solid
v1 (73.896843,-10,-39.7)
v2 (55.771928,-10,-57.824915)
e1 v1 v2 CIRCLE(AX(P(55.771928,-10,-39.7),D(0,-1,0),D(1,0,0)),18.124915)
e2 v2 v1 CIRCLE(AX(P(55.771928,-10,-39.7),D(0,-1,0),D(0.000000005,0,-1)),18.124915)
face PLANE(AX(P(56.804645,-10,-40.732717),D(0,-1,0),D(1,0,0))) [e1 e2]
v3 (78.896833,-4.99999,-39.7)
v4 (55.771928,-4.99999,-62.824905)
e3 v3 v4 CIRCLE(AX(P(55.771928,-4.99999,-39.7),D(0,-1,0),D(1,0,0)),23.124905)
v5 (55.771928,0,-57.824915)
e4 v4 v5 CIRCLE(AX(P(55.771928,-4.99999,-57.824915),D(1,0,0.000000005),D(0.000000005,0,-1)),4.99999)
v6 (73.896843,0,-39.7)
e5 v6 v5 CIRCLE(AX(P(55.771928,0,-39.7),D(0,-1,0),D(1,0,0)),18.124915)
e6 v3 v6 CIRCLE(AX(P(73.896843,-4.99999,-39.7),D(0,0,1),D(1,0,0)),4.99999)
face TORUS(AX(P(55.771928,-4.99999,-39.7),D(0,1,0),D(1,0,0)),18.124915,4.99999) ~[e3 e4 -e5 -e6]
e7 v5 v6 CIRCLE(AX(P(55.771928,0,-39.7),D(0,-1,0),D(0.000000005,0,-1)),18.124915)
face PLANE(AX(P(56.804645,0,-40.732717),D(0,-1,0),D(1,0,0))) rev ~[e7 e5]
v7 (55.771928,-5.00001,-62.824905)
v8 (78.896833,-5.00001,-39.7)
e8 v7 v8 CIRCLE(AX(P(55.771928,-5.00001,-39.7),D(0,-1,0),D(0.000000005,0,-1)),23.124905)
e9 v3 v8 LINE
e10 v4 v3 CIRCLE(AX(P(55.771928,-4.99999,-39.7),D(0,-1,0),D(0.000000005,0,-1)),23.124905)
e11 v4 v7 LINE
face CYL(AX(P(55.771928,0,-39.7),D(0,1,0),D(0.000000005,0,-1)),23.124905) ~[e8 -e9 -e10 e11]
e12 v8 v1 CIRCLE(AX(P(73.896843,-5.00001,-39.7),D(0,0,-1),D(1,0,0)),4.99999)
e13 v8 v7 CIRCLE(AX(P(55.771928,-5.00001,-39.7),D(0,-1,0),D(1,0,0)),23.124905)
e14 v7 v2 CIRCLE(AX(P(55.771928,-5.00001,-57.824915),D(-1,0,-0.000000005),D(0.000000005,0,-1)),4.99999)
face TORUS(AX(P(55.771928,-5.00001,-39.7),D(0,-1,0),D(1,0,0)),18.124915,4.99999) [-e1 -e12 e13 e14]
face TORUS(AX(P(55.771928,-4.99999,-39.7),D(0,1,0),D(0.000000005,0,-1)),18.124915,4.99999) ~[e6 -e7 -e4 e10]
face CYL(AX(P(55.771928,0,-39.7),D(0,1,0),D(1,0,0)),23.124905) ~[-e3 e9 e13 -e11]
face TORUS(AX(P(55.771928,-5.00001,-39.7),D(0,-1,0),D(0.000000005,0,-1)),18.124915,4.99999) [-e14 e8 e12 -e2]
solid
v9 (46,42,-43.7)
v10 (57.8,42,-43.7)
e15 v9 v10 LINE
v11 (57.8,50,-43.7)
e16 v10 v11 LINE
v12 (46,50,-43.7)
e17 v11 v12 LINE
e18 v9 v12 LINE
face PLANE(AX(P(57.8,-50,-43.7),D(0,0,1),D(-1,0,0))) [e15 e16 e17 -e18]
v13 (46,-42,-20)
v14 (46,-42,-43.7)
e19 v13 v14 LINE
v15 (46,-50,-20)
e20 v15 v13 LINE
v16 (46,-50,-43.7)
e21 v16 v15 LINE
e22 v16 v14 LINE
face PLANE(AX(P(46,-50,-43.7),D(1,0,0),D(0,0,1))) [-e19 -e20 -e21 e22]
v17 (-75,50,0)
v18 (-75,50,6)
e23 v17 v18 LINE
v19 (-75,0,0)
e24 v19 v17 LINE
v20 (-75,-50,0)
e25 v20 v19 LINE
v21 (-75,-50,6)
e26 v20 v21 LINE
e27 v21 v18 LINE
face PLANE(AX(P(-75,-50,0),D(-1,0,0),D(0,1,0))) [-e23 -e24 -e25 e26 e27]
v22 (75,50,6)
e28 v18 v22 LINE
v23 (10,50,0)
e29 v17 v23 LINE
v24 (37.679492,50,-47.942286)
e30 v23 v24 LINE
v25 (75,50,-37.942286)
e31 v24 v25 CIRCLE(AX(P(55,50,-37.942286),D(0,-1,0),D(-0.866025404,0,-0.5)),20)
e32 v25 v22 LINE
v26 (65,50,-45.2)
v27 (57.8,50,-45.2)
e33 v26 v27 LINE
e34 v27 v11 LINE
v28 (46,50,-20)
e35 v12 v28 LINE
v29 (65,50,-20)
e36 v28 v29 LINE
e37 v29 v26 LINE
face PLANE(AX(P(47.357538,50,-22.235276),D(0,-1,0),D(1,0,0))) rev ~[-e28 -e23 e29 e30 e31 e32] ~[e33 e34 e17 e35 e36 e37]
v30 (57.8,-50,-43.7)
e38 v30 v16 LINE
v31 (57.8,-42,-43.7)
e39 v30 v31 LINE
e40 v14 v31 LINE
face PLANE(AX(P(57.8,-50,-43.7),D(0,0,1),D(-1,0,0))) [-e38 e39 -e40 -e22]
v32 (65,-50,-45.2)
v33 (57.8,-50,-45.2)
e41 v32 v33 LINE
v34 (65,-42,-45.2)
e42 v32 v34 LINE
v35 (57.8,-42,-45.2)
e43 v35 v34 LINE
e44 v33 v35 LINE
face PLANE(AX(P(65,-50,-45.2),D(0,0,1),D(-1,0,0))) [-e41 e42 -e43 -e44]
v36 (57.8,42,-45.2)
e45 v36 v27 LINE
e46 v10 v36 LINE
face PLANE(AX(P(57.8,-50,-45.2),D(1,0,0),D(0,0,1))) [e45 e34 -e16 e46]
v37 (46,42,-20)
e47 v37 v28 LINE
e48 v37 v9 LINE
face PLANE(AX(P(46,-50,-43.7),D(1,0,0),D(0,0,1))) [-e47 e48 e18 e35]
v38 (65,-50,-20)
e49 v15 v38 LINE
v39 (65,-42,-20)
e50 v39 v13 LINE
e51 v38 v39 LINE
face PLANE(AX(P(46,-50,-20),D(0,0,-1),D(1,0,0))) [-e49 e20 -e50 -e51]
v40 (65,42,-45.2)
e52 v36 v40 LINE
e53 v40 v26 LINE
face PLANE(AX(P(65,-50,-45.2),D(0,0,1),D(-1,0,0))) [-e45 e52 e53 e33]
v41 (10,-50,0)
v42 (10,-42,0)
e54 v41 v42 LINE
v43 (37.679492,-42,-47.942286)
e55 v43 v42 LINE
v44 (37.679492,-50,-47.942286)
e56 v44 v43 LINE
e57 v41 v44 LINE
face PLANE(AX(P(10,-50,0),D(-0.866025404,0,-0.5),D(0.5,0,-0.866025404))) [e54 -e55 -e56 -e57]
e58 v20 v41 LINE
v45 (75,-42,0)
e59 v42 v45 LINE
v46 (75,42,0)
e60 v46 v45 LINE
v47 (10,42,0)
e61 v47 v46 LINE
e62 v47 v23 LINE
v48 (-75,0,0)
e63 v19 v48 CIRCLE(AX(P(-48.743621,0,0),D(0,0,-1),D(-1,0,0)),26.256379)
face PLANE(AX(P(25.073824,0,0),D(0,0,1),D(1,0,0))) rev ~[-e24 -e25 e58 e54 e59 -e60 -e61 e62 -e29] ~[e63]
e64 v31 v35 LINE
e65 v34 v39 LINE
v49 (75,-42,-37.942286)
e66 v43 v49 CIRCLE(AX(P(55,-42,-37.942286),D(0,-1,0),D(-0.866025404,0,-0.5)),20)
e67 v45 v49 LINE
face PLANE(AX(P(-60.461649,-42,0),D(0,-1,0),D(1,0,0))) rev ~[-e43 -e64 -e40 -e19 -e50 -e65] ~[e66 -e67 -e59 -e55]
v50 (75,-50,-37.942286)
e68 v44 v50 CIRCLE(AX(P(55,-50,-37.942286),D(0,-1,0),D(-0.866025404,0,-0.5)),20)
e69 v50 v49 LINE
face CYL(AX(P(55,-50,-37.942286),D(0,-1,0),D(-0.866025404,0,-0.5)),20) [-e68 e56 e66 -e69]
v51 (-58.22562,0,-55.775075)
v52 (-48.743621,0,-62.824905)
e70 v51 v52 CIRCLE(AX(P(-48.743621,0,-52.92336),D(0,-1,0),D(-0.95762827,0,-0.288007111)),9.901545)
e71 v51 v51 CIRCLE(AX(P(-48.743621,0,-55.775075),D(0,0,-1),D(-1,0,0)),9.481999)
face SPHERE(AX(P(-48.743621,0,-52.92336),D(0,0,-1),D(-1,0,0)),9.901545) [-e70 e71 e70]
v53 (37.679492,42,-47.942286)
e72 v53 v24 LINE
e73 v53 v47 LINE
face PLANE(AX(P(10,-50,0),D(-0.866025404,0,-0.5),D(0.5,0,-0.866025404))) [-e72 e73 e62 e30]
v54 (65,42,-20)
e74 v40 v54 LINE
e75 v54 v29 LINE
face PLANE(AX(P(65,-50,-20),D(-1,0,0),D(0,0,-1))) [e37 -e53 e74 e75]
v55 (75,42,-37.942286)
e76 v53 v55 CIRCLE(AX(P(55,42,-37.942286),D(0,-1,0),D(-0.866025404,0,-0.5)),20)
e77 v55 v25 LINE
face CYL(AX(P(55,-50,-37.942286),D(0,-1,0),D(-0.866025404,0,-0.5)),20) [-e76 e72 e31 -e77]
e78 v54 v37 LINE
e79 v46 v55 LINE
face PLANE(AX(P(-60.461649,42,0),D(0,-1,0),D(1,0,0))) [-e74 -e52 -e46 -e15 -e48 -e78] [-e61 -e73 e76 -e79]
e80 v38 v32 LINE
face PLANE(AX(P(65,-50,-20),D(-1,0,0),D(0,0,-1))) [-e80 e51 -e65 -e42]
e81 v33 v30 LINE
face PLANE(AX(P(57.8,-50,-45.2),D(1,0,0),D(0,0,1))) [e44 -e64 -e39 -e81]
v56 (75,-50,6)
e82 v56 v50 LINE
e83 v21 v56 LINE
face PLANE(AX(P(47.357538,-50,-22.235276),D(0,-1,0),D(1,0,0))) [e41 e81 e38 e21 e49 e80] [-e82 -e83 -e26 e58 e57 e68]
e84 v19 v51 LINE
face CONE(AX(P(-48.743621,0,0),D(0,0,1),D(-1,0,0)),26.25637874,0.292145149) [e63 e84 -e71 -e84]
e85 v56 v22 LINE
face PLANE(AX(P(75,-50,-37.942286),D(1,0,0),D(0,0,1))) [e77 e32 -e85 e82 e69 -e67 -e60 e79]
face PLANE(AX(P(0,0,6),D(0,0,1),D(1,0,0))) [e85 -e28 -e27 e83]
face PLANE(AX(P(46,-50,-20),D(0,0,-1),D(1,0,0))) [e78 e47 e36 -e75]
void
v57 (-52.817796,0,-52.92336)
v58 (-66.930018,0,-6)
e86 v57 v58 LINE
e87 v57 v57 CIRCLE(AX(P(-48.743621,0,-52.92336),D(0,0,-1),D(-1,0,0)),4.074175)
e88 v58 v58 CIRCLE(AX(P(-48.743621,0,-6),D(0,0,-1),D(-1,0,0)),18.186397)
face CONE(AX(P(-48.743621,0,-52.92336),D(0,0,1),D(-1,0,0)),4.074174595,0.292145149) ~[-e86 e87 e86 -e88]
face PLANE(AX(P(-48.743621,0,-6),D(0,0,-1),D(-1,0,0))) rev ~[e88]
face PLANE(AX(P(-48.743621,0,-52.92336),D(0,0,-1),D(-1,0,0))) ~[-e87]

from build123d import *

# Parameters (mm, degrees)
F0_W     = 150
F0_H     = 100
F1_DEPTH = 6
F5_DEPTH = 100
F3_W     = 171.0709459866
F3_H     = 84
F6_DEPTH = 200
F8_DEPTH = 10
F9_R     = 4.99999


# Not quite as in the source:
# - a fillet or chamfer is up to 0.001 mm smaller than in the source, because OpenCascade refuses the exact size


with BuildPart() as f1:
    # F0 (on Top) → F1 (new body)
    with BuildSketch(Plane.XY):
        Rectangle(F0_W, F0_H)
    extrude(amount=F1_DEPTH)

    # F2 (on face) → F5 (join)
    with BuildSketch(Plane.XZ.offset(50)):
        with BuildLine():
            Line((75, 0), (10, 0))
            Line((10, 0), (37.6794919243, -47.9422863406))
            ThreePointArc((37.6794919243, -47.9422863406), (60.1763809021, -57.2608028664), (75, -37.9422863406))
            Line((75, -37.9422863406), (75, 0))
        make_face()
        Polygon((46, -20), (65, -20), (65, -45.2), (57.8, -45.2), (57.8, -43.7), (46, -43.7), align=None, mode=Mode.SUBTRACT)
    extrude(amount=-F5_DEPTH)

    # F3 (on Top) → F6 (cut)
    with BuildSketch(Plane.XY):
        with Locations((25.0738235191, 0)):
            Rectangle(F3_W, F3_H)
    extrude(amount=-F6_DEPTH, mode=Mode.SUBTRACT)

    # F4 (on Front) → F7 (revolve)
    with BuildSketch(Plane.XZ):
        with BuildLine():
            Line((-48.7436212599, 0), (-75, 0))
            Line((-75, 0), (-58.2256204143, -55.7750751688))
            ThreePointArc((-58.2256204143, -55.7750751688), (-58.2296045097, -50.0849254651), (-55.1008508317, -45.3321662722))
            Line((-55.1008508317, -45.3321662722), (-66.9300179817, -6))
            Line((-66.9300179817, -6), (-48.7436212599, -6))
            Line((-48.7436212599, -6), (-48.7436212599, 0))
        make_face()
        with BuildLine():
            ThreePointArc((-55.1008508317, -45.3321662722), (-58.2296045097, -50.0849254651), (-58.2256204143, -55.7750751688))
            ThreePointArc((-58.2256204143, -55.7750751688), (-54.6514212532, -60.8693328985), (-48.7436212599, -62.8249046049))
            Line((-48.7436212599, -62.8249046049), (-48.7436212599, -52.923359872))
            Line((-48.7436212599, -52.923359872), (-52.8177958548, -52.923359872))
            Line((-52.8177958548, -52.923359872), (-55.1008508317, -45.3321662722))
        make_face()
    revolve(axis=Axis((-48.7436212599, 0, -43.6514355242), (0, 0, -1)))


with BuildPart() as f8:
    # F4 (on Front) → F8 (new body)
    with BuildSketch(Plane.XZ):
        with BuildLine():
            ThreePointArc((78.8968328855, -39.7), (39.4201513826, -23.3482231771), (55.7719283868, -62.8249046049))
            ThreePointArc((55.7719283868, -62.8249046049), (72.1237051786, -56.0517768229), (78.8968328855, -39.7))
        make_face()
    extrude(amount=F8_DEPTH)

    # F9 (radius 5 in the source; OpenCascade refuses exactly that, so slightly less here)
    f9_edges = [f8.edges().sort_by_distance(p)[0] for p in [
        (55.771928, 0, -16.575095),
        (55.771928, -5, -62.824905),
        (55.771928, -10, -16.575095),
    ]]
    fillet(f9_edges, radius=F9_R)


solid = Compound([f1.part, f8.part])
